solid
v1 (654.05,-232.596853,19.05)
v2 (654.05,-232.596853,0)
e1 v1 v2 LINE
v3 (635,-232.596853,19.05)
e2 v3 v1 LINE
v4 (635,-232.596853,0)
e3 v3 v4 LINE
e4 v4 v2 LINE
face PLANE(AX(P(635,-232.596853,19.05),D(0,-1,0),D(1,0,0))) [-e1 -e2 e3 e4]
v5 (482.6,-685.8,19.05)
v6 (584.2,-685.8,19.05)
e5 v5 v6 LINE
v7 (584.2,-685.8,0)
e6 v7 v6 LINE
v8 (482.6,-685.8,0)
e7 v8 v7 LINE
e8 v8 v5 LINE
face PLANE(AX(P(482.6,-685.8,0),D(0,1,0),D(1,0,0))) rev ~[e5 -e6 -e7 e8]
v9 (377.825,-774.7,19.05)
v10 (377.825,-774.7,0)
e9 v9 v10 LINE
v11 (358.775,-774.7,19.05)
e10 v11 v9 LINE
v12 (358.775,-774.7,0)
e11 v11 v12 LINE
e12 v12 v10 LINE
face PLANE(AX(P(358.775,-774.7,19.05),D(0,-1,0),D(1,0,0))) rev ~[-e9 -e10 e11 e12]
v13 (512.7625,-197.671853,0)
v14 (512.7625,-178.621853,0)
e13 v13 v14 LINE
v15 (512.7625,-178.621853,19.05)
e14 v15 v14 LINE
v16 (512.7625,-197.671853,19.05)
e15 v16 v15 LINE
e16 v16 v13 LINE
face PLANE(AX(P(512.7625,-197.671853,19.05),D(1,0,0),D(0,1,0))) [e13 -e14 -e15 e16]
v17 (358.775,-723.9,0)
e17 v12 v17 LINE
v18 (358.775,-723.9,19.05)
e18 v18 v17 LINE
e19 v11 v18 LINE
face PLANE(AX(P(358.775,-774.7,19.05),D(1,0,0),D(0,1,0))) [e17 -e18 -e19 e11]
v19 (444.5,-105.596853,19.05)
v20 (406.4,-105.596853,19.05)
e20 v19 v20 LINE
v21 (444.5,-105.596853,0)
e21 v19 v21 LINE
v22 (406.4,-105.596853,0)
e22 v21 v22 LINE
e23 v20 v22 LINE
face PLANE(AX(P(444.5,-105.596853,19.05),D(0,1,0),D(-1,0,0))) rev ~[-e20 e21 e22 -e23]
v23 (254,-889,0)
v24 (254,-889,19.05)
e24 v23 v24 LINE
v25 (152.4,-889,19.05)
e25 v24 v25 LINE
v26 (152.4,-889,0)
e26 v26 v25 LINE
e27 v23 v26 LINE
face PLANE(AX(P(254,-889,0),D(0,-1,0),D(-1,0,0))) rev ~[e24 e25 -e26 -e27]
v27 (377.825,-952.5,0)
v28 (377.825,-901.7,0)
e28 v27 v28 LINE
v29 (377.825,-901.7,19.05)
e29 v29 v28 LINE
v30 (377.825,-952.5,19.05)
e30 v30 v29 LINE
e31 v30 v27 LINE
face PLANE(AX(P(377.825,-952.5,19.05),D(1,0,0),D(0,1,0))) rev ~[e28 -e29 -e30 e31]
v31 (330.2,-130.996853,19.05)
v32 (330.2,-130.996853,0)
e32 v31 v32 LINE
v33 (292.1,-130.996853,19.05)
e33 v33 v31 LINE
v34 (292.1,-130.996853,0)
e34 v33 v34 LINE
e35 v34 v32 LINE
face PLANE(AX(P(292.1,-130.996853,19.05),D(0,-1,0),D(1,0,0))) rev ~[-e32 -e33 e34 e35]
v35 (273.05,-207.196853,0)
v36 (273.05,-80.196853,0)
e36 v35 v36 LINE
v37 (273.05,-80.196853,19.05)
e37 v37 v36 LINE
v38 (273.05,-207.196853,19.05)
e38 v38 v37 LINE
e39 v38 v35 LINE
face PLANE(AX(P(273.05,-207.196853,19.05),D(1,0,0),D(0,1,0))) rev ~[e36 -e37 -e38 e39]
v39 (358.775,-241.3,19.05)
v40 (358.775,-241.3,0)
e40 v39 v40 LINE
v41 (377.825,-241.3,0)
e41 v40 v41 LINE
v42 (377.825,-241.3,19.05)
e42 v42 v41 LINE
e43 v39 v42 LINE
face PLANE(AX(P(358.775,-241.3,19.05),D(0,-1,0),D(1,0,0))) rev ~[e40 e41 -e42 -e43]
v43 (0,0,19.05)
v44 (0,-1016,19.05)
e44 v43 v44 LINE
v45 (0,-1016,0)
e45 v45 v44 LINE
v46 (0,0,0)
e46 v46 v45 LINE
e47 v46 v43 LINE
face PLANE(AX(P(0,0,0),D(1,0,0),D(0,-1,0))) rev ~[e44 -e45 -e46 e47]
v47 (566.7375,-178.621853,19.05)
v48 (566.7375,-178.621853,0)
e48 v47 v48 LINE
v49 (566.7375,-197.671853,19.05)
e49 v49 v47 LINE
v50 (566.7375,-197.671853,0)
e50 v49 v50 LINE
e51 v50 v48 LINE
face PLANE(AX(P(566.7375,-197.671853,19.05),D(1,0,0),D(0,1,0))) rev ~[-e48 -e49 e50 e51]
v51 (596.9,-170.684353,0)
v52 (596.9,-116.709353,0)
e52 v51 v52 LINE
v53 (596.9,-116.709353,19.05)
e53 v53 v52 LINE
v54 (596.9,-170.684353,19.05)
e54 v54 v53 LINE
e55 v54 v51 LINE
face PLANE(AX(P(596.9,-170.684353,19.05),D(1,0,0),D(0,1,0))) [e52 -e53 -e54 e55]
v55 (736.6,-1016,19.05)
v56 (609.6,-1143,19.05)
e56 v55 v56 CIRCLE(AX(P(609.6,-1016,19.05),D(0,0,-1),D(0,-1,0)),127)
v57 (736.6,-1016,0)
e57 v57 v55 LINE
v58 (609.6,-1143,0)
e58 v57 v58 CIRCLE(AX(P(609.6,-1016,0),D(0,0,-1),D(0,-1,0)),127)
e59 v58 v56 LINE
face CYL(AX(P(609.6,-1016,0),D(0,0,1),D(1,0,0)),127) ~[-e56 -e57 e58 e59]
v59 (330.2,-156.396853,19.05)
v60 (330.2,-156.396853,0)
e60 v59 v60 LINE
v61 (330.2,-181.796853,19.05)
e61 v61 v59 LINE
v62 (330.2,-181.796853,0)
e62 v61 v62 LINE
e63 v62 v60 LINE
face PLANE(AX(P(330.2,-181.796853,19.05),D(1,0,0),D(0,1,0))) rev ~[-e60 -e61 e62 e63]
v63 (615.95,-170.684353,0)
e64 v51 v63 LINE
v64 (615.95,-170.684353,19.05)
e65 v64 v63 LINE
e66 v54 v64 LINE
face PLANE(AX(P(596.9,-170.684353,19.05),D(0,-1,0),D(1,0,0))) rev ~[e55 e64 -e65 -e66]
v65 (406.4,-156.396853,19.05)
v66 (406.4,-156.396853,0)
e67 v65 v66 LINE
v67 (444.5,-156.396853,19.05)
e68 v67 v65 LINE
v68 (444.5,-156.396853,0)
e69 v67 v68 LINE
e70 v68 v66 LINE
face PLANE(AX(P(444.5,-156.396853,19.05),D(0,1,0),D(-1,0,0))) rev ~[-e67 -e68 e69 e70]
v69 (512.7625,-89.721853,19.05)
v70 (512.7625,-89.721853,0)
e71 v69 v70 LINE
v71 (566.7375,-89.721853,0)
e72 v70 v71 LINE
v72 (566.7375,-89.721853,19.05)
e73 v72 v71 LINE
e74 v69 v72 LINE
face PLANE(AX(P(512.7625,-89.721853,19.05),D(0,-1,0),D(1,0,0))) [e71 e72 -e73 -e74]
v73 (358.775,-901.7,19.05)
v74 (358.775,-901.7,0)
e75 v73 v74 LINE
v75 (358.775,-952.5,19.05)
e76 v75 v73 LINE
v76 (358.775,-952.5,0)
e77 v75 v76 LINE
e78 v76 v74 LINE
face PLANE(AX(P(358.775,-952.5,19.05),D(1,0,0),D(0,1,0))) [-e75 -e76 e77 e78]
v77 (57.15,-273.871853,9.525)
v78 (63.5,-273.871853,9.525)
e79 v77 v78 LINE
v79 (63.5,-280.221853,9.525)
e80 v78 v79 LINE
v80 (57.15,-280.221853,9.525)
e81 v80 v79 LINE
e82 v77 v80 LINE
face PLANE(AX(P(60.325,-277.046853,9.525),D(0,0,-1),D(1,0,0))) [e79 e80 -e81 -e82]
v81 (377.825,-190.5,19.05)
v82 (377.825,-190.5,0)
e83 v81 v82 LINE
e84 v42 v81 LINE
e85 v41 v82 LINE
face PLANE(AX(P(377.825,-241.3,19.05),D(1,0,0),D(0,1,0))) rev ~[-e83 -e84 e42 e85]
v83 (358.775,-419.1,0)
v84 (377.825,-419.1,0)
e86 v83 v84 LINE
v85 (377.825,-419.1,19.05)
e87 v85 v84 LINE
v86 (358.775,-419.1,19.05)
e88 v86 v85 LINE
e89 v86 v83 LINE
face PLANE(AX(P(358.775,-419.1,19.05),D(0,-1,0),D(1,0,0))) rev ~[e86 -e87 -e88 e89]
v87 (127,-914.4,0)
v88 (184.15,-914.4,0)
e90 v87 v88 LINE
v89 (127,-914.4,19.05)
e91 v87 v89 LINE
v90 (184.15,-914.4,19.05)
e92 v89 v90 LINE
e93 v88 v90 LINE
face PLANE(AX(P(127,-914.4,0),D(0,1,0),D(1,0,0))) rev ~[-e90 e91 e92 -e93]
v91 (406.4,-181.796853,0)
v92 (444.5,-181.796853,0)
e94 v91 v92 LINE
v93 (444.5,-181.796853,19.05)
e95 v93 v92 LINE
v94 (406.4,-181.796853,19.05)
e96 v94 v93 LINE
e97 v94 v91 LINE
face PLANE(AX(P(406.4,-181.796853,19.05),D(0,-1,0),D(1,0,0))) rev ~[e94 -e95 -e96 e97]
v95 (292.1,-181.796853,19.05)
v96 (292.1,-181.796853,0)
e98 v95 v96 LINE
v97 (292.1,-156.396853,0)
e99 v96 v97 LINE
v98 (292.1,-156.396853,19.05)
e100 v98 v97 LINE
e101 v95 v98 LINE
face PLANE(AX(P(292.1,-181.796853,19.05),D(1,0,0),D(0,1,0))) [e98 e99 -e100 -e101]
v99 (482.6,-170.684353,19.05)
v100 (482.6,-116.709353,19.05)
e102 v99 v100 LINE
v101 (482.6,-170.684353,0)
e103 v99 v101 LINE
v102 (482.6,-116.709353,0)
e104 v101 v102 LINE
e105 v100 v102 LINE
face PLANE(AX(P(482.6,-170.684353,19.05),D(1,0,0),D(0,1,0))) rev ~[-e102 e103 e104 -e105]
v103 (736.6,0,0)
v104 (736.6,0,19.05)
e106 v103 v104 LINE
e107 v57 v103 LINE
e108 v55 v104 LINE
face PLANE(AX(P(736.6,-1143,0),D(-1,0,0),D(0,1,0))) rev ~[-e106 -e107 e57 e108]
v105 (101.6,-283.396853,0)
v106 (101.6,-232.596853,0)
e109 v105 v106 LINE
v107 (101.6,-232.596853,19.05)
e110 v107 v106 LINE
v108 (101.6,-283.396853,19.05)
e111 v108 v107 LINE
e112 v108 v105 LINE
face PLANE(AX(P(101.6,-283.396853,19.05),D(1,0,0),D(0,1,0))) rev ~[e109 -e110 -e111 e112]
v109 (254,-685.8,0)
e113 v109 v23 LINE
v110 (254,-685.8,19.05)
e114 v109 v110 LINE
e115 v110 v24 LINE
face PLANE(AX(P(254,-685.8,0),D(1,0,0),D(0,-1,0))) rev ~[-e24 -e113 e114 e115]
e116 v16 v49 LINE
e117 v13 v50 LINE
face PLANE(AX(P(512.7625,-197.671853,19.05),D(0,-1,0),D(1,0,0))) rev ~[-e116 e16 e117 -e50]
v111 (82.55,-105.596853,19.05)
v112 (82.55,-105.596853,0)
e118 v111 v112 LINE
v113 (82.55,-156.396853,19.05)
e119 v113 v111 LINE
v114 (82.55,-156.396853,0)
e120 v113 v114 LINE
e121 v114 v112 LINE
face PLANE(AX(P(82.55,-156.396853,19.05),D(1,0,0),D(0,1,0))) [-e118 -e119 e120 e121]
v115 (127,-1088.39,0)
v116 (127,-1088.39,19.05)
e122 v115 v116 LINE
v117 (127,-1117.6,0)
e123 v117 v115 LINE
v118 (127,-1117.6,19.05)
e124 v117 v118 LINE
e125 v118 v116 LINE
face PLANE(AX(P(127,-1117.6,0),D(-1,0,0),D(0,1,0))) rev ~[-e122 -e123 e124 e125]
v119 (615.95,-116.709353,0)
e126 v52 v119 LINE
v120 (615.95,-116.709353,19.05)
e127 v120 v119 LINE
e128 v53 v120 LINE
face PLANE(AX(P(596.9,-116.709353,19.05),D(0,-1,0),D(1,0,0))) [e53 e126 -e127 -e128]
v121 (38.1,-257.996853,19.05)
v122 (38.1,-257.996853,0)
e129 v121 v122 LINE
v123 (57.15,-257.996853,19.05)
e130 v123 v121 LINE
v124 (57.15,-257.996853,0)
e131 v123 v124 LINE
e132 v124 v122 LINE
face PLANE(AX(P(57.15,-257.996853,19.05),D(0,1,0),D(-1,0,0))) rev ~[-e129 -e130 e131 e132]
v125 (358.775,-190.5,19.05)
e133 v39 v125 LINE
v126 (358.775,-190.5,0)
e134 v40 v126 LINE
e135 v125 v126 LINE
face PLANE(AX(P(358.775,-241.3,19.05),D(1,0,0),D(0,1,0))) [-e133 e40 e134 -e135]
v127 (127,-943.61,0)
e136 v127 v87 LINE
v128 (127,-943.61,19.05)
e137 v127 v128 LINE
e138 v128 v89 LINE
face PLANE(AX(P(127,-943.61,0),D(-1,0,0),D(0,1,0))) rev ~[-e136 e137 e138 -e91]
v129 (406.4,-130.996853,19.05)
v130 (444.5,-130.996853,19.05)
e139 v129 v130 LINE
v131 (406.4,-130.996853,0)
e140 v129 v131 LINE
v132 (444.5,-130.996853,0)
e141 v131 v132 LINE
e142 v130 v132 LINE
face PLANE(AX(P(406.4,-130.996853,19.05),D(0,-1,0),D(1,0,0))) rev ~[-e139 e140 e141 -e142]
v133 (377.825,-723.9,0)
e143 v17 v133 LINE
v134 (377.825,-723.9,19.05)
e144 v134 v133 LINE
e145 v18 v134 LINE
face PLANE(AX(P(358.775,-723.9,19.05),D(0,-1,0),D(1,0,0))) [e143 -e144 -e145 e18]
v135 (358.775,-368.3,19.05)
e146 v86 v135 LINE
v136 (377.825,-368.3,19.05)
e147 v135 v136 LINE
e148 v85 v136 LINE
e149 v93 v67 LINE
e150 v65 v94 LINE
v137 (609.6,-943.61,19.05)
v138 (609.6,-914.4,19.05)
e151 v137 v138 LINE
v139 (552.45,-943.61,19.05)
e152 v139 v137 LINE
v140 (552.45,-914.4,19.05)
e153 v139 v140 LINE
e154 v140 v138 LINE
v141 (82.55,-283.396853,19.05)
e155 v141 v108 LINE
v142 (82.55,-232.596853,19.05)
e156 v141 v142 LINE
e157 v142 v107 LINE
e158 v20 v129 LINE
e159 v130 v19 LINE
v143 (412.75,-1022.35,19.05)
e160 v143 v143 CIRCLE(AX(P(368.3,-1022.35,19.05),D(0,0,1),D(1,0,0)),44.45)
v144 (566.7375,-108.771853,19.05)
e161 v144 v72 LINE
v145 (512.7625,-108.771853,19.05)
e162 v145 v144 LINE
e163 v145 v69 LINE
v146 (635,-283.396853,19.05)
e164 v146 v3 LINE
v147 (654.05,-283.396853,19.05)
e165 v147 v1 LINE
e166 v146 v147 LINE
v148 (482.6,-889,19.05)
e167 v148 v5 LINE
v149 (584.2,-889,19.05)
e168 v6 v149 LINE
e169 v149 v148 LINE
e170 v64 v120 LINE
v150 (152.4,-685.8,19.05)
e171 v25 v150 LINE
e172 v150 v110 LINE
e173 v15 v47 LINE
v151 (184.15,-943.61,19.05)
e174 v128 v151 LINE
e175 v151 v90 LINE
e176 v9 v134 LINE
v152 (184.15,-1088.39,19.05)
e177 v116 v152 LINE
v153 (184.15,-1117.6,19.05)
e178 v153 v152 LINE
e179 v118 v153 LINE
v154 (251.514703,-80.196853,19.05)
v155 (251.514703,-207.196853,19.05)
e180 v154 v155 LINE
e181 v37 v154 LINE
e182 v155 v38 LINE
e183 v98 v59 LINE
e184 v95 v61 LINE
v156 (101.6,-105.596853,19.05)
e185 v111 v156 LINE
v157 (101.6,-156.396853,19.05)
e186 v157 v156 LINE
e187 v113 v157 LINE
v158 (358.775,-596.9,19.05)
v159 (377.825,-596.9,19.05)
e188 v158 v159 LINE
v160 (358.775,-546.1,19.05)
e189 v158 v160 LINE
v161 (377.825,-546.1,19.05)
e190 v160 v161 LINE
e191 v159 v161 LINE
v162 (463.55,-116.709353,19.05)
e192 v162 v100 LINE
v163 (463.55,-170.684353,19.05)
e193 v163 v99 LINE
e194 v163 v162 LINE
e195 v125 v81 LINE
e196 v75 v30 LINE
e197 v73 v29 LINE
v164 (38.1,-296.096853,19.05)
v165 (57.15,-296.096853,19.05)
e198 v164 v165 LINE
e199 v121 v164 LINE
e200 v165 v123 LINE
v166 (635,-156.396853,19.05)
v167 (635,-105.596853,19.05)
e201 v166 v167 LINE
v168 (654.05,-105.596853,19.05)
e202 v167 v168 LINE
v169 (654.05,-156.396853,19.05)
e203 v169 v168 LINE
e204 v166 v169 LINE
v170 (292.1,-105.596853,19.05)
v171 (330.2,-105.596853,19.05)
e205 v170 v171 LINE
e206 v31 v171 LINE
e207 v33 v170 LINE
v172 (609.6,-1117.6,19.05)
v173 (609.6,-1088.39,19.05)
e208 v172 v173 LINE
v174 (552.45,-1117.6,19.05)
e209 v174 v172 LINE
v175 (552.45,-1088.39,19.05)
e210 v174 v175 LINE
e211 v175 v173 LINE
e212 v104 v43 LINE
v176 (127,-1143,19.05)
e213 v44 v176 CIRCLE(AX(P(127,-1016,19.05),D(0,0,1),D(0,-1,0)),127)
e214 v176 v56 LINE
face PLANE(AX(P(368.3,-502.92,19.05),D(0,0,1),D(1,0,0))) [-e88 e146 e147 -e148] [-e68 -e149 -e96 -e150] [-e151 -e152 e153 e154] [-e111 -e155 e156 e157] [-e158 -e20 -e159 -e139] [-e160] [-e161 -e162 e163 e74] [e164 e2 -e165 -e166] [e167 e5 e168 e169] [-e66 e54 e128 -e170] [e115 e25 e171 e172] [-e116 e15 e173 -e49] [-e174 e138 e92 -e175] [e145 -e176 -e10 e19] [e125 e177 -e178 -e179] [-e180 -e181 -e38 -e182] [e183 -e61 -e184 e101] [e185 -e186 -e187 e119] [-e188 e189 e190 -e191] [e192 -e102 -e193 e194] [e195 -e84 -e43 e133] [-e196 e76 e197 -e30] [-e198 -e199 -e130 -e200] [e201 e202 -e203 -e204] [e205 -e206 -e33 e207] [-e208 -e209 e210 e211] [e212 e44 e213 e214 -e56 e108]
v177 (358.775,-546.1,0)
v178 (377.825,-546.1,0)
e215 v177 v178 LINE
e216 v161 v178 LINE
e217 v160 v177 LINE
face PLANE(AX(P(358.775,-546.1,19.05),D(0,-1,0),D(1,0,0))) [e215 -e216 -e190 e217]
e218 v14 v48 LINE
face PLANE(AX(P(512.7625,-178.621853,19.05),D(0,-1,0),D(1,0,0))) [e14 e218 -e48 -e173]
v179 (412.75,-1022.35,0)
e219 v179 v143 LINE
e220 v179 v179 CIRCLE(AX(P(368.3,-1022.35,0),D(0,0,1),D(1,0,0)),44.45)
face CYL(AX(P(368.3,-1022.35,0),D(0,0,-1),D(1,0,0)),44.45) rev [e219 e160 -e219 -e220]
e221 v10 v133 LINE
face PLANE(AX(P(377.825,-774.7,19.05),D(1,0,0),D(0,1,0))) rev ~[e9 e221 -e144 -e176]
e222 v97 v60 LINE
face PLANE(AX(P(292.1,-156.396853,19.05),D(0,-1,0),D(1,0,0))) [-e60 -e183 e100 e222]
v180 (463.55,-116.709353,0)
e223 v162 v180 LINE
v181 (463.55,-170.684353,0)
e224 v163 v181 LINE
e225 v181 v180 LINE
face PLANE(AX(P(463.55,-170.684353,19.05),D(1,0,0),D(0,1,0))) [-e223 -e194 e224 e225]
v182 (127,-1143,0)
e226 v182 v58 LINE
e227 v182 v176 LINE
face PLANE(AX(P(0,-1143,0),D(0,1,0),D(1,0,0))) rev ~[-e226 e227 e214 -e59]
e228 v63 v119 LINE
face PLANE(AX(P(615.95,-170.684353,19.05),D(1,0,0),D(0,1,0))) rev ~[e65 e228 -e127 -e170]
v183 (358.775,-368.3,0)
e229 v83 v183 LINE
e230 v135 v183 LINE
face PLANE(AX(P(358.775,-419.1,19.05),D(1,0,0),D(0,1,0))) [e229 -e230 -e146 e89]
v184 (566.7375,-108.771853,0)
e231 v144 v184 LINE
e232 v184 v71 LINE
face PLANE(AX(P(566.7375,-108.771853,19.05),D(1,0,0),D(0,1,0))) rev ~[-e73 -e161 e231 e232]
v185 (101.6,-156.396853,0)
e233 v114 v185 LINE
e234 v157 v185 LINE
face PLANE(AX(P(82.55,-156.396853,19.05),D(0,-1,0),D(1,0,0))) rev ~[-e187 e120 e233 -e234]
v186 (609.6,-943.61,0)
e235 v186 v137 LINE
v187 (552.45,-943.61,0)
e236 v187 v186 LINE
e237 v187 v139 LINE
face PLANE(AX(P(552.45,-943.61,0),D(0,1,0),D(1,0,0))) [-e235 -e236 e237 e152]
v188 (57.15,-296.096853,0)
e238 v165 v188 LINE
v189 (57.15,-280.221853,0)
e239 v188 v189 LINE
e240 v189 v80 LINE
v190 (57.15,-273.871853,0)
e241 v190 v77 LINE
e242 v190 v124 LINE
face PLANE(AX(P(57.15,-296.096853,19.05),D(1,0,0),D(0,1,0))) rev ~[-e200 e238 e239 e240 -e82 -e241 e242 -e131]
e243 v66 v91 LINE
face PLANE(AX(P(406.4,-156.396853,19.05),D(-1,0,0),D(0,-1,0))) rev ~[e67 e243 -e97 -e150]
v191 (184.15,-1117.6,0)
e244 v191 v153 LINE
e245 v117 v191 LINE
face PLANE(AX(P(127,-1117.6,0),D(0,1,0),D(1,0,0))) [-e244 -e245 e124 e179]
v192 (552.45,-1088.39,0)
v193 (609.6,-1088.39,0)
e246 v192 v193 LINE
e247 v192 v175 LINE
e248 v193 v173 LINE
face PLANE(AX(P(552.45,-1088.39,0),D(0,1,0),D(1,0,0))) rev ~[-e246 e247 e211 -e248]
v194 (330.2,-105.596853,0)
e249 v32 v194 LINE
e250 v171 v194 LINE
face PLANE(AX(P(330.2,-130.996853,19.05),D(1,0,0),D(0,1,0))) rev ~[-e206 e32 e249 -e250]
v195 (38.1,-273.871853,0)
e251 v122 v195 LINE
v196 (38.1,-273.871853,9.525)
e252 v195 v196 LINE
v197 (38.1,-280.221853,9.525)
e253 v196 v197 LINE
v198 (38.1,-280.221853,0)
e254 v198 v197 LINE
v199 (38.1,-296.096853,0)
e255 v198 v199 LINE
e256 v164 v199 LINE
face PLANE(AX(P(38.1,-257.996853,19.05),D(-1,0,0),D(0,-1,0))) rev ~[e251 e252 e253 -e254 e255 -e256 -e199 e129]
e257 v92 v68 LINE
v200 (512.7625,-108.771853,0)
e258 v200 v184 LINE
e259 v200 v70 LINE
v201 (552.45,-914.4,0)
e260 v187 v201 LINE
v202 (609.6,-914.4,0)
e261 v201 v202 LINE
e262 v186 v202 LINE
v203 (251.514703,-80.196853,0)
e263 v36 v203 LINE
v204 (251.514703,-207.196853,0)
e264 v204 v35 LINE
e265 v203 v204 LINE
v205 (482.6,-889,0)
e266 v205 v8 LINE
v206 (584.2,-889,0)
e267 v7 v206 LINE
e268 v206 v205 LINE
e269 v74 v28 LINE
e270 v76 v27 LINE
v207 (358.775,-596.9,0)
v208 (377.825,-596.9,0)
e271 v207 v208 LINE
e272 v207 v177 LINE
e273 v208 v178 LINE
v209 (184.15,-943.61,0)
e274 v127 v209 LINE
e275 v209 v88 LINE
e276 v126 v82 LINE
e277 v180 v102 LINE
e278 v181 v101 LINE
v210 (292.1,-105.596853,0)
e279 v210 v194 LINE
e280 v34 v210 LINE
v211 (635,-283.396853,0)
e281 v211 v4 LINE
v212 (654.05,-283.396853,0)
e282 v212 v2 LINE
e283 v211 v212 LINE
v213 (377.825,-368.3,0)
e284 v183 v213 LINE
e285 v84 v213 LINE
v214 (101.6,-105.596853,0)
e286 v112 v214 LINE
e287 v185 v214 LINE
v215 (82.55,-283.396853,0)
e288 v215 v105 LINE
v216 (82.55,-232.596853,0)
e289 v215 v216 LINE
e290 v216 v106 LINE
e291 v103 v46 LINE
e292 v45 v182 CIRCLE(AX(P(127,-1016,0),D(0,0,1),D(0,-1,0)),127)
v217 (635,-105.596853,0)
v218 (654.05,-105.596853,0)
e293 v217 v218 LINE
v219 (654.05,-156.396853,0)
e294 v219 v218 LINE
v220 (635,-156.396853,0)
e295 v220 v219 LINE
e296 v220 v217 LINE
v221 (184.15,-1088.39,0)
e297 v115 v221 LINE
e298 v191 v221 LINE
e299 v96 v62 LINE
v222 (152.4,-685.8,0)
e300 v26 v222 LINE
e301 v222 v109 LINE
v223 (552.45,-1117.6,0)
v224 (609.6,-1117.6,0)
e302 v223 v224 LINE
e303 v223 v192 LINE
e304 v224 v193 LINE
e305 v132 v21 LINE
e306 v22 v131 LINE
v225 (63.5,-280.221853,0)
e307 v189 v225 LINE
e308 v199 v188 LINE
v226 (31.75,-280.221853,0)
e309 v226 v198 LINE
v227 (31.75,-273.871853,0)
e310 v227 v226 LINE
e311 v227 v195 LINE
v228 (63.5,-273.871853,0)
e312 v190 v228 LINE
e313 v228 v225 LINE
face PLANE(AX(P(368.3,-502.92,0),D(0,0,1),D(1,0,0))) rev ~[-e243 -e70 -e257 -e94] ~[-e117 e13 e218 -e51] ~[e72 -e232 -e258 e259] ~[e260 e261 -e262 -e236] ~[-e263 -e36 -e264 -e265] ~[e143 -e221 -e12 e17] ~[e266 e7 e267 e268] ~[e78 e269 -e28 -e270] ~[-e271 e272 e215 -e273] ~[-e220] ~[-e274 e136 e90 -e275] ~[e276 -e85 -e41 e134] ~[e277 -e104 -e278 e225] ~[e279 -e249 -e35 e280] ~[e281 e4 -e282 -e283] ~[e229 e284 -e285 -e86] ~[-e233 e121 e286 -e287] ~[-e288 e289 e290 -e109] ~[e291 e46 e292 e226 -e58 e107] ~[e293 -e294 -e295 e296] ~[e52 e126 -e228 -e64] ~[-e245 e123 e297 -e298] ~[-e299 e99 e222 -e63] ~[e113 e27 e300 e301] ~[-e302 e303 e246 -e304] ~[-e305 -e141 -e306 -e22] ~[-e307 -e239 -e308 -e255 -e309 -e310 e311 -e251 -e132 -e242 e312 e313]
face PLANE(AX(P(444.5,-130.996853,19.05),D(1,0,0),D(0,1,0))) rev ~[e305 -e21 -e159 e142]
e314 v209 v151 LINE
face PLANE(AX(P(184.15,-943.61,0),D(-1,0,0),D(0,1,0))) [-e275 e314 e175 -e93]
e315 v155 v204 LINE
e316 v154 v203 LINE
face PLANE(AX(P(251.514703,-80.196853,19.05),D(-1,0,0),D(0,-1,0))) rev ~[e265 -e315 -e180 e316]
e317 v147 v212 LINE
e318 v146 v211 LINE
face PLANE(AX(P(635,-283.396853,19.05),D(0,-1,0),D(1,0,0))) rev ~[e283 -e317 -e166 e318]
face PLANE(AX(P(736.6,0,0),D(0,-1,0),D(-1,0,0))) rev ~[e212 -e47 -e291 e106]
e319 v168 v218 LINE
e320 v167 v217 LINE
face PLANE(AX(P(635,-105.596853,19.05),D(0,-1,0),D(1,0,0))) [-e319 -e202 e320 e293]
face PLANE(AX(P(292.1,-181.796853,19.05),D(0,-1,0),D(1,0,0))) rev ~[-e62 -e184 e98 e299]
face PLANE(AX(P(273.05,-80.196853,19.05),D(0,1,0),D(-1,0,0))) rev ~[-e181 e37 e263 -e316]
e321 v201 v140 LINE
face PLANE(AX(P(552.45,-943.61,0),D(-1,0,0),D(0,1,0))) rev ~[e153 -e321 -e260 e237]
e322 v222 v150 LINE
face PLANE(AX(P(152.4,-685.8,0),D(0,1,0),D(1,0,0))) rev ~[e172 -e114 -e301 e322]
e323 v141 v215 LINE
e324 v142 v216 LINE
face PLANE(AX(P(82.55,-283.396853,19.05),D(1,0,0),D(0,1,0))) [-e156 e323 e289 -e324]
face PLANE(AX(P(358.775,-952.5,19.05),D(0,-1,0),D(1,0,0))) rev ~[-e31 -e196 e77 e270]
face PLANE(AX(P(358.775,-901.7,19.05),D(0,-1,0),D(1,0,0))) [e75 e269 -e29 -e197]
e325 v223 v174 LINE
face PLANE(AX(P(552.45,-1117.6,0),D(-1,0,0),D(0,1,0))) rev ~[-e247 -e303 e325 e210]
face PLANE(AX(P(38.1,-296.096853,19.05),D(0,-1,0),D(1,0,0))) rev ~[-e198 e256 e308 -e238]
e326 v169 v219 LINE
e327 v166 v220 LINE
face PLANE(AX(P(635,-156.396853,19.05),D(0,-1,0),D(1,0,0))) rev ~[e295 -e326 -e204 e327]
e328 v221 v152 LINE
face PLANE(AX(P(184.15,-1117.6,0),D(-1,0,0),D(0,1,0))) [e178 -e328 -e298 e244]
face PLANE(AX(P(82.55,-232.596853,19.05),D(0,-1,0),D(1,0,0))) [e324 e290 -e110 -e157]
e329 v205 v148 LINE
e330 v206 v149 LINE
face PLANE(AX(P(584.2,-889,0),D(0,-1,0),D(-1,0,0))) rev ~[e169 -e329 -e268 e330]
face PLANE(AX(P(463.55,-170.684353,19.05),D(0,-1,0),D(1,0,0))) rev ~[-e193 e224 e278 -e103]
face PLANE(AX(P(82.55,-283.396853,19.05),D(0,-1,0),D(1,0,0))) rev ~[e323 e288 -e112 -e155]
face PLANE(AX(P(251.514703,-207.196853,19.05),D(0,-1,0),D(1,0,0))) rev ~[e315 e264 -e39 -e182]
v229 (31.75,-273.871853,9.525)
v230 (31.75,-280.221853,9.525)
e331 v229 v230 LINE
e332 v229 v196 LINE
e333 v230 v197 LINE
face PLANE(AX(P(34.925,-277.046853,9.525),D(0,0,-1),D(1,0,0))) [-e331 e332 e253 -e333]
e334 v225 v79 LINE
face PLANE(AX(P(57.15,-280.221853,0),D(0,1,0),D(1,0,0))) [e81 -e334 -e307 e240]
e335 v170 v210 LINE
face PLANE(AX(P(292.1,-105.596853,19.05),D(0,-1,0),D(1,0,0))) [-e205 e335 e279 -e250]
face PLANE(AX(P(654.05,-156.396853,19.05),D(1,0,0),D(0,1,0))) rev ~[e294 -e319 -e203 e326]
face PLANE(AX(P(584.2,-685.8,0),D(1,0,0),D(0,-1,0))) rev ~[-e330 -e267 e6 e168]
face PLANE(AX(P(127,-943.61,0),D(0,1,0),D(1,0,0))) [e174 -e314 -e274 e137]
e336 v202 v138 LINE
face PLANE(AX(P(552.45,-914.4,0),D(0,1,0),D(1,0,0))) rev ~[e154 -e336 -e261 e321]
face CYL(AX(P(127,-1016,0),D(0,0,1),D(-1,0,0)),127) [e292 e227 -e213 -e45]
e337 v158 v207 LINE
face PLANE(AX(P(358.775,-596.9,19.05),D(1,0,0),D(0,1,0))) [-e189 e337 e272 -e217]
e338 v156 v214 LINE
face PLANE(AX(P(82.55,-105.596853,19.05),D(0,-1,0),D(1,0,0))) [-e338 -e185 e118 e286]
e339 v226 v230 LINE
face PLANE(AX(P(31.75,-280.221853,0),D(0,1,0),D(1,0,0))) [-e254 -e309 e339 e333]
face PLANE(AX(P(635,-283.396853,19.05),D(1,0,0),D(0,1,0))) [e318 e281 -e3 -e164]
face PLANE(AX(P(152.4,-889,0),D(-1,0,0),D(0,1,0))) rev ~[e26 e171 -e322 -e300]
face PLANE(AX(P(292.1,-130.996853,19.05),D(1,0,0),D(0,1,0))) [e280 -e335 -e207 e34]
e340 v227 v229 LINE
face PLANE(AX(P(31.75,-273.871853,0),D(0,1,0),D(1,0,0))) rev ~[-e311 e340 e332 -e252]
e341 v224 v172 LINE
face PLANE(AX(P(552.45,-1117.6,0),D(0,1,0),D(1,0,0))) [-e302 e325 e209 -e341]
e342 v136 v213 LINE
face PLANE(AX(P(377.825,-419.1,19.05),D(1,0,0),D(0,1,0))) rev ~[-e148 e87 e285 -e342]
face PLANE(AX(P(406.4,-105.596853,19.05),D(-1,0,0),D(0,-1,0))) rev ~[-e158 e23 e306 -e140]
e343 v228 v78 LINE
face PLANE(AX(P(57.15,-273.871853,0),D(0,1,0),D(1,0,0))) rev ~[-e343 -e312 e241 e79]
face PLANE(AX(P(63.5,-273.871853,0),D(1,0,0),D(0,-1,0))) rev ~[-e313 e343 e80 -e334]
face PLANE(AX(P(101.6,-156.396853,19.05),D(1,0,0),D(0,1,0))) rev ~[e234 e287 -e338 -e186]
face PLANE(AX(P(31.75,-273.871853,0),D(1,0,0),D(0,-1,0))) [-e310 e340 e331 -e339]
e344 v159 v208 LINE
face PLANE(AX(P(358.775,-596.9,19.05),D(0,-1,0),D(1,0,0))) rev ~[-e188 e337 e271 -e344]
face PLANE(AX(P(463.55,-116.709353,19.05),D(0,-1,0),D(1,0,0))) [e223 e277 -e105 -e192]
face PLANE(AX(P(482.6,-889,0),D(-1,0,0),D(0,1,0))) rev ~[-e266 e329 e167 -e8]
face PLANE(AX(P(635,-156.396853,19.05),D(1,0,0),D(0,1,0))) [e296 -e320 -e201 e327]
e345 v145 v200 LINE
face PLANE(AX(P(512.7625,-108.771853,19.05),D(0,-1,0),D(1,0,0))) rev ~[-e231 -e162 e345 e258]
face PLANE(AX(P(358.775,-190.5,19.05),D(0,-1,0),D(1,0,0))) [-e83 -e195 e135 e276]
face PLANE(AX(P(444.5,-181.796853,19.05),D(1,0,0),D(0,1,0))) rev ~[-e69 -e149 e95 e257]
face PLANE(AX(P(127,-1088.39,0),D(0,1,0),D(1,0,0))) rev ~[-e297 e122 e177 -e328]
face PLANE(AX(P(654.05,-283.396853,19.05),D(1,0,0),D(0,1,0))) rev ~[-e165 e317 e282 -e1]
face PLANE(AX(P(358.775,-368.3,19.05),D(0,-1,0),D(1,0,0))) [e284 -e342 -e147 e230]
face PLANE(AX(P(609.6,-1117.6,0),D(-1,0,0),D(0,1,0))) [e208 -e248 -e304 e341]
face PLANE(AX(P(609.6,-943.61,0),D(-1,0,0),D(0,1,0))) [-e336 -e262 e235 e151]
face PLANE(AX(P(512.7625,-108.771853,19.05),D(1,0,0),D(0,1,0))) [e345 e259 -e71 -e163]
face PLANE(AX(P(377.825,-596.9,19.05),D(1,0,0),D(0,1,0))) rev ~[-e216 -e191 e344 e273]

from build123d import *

# Parameters (mm, degrees)
F0_W      = 57.15
F0_H      = 29.21
F0_R      = 44.45
F1_DEPTH  = 19.05
F2_W      = 19.05
F2_H      = 50.8
F3_DEPTH  = 25.4
F4_W      = 19.05
F4_H      = 50.8
F5_DEPTH  = 25.4
F6_W      = 38.1
F6_H      = 25.4
F6_W_2    = 53.975
F6_H_2    = 19.05
F6_W_3    = 19.05
F6_H_3    = 53.975
F7_DEPTH  = 25.4
F8_R      = 127
F10_DEPTH = 25.4
F11_W     = 6.35
F11_H     = 6.35
F12_DEPTH = 9.525


# Not quite as in the source:
# - a feature names something its author has since deleted; it is built from what else it names


with BuildPart() as f1:
    # F0 (on Top) → F1 (new body)
    with BuildSketch(Plane.XY):
        Polygon((358.775, 0), (0, 0), (0, -889), (152.4, -889), (152.4, -685.8), (254, -685.8), (254, -889), (482.6, -889), (482.6, -685.8), (584.2, -685.8), (584.2, -889), (736.6, -889), (736.6, 0), (377.825, 0), align=None)
        Polygon((152.4, -889), (0, -889), (0, -1143), (358.775, -1143), (377.825, -1143), (736.6, -1143), (736.6, -889), (584.2, -889), (482.6, -889), (254, -889), align=None)
        with Locations((155.575, -1102.995)):
            Rectangle(F0_W, F0_H, mode=Mode.SUBTRACT)
        with Locations((155.575, -929.005)):
            Rectangle(F0_W, F0_H, mode=Mode.SUBTRACT)
        with Locations((368.3, -1022.35)):
            Circle(F0_R, mode=Mode.SUBTRACT)
        with Locations((581.025, -1102.995)):
            Rectangle(F0_W, F0_H, mode=Mode.SUBTRACT)
        with Locations((581.025, -929.005)):
            Rectangle(F0_W, F0_H, mode=Mode.SUBTRACT)
    extrude(amount=F1_DEPTH)

    # F2 (on face) → F3 (cut)
    with BuildSketch(Plane.XY.offset(19.05)):
        with Locations((368.3, -215.9)):
            Rectangle(F2_W, F2_H)
        with Locations((368.3, -393.7)):
            Rectangle(F2_W, F2_H)
        with Locations((368.3, -571.5)):
            Rectangle(F2_W, F2_H)
        with Locations((368.3, -749.3)):
            Rectangle(F2_W, F2_H)
        with Locations((368.3, -927.1)):
            Rectangle(F2_W, F2_H)
    extrude(amount=-F3_DEPTH, mode=Mode.SUBTRACT)

    # F4 (on face) → F5 (cut)
    with BuildSketch(Plane.XY.offset(19.05)):
        with Locations((92.075, -130.9968532642)):
            Rectangle(F4_W, F4_H)
        with Locations((92.075, -257.9968532642)):
            Rectangle(F4_W, F4_H)
        with Locations((644.525, -130.9968532642)):
            Rectangle(F4_W, F4_H)
        with Locations((644.525, -257.9968532642)):
            Rectangle(F4_W, F4_H)
    extrude(amount=-F5_DEPTH, mode=Mode.SUBTRACT)

    # F6 (on face) → F7 (cut)
    with BuildSketch(Plane.XY.offset(19.05)):
        with Locations((311.15, -118.2968532642)):
            Rectangle(F6_W, F6_H)
        with Locations((311.15, -169.0968532642)):
            Rectangle(F6_W, F6_H)
        Polygon((444.5, -170.6843532642), (444.5, -156.3968532642), (406.4, -156.3968532642), (406.4, -181.7968532642), (444.5, -181.7968532642), align=None)
        Polygon((444.5, -116.7093532642), (444.5, -105.5968532642), (406.4, -105.5968532642), (406.4, -130.9968532642), (444.5, -130.9968532642), align=None)
        with Locations((539.75, -99.2468532642)):
            Rectangle(F6_W_2, F6_H_2)
        with Locations((473.075, -143.6968532642)):
            Rectangle(F6_W_3, F6_H_3)
        with Locations((539.75, -188.1468532642)):
            Rectangle(F6_W_2, F6_H_2)
        with Locations((606.425, -143.6968532642)):
            Rectangle(F6_W_3, F6_H_3)
        Polygon((273.05, -207.1968532642), (273.05, -143.6968532642), (273.05, -80.1968532642), (251.5147030354, -80.1968532642), (251.5147030354, -207.1968532642), align=None)
    extrude(amount=-F7_DEPTH, mode=Mode.SUBTRACT)

    # F8
    f8_edges = [f1.edges().sort_by_distance(p)[0] for p in [
        (0, -1143, 9.525),
        (736.6, -1143, 9.525),
    ]]
    fillet(f8_edges, radius=F8_R)

    # F9 (on face) → F10 (cut)
    with BuildSketch(Plane.XY.offset(19.05)):
        Polygon((57.15, -257.9968532642), (38.1, -257.9968532642), (38.1, -273.8015651703), (38.1, -280.3961336613), (38.1, -296.0968532642), (57.15, -296.0968532642), (57.15, -280.3961336613), (57.15, -273.8015651703), align=None)
    extrude(amount=-F10_DEPTH, mode=Mode.SUBTRACT)

    # F11 (on face) → F12 (cut)
    with BuildSketch(Plane(origin=(0, 0, 0), x_dir=(1, 0, 0), z_dir=(0, 0, -1))):
        with Locations((34.925, 277.0468532642)):
            Rectangle(F11_W, F11_H)
        with Locations((60.325, 277.0468532642)):
            Rectangle(F11_W, F11_H)
    extrude(amount=-F12_DEPTH, mode=Mode.SUBTRACT)


solid = f1.part
